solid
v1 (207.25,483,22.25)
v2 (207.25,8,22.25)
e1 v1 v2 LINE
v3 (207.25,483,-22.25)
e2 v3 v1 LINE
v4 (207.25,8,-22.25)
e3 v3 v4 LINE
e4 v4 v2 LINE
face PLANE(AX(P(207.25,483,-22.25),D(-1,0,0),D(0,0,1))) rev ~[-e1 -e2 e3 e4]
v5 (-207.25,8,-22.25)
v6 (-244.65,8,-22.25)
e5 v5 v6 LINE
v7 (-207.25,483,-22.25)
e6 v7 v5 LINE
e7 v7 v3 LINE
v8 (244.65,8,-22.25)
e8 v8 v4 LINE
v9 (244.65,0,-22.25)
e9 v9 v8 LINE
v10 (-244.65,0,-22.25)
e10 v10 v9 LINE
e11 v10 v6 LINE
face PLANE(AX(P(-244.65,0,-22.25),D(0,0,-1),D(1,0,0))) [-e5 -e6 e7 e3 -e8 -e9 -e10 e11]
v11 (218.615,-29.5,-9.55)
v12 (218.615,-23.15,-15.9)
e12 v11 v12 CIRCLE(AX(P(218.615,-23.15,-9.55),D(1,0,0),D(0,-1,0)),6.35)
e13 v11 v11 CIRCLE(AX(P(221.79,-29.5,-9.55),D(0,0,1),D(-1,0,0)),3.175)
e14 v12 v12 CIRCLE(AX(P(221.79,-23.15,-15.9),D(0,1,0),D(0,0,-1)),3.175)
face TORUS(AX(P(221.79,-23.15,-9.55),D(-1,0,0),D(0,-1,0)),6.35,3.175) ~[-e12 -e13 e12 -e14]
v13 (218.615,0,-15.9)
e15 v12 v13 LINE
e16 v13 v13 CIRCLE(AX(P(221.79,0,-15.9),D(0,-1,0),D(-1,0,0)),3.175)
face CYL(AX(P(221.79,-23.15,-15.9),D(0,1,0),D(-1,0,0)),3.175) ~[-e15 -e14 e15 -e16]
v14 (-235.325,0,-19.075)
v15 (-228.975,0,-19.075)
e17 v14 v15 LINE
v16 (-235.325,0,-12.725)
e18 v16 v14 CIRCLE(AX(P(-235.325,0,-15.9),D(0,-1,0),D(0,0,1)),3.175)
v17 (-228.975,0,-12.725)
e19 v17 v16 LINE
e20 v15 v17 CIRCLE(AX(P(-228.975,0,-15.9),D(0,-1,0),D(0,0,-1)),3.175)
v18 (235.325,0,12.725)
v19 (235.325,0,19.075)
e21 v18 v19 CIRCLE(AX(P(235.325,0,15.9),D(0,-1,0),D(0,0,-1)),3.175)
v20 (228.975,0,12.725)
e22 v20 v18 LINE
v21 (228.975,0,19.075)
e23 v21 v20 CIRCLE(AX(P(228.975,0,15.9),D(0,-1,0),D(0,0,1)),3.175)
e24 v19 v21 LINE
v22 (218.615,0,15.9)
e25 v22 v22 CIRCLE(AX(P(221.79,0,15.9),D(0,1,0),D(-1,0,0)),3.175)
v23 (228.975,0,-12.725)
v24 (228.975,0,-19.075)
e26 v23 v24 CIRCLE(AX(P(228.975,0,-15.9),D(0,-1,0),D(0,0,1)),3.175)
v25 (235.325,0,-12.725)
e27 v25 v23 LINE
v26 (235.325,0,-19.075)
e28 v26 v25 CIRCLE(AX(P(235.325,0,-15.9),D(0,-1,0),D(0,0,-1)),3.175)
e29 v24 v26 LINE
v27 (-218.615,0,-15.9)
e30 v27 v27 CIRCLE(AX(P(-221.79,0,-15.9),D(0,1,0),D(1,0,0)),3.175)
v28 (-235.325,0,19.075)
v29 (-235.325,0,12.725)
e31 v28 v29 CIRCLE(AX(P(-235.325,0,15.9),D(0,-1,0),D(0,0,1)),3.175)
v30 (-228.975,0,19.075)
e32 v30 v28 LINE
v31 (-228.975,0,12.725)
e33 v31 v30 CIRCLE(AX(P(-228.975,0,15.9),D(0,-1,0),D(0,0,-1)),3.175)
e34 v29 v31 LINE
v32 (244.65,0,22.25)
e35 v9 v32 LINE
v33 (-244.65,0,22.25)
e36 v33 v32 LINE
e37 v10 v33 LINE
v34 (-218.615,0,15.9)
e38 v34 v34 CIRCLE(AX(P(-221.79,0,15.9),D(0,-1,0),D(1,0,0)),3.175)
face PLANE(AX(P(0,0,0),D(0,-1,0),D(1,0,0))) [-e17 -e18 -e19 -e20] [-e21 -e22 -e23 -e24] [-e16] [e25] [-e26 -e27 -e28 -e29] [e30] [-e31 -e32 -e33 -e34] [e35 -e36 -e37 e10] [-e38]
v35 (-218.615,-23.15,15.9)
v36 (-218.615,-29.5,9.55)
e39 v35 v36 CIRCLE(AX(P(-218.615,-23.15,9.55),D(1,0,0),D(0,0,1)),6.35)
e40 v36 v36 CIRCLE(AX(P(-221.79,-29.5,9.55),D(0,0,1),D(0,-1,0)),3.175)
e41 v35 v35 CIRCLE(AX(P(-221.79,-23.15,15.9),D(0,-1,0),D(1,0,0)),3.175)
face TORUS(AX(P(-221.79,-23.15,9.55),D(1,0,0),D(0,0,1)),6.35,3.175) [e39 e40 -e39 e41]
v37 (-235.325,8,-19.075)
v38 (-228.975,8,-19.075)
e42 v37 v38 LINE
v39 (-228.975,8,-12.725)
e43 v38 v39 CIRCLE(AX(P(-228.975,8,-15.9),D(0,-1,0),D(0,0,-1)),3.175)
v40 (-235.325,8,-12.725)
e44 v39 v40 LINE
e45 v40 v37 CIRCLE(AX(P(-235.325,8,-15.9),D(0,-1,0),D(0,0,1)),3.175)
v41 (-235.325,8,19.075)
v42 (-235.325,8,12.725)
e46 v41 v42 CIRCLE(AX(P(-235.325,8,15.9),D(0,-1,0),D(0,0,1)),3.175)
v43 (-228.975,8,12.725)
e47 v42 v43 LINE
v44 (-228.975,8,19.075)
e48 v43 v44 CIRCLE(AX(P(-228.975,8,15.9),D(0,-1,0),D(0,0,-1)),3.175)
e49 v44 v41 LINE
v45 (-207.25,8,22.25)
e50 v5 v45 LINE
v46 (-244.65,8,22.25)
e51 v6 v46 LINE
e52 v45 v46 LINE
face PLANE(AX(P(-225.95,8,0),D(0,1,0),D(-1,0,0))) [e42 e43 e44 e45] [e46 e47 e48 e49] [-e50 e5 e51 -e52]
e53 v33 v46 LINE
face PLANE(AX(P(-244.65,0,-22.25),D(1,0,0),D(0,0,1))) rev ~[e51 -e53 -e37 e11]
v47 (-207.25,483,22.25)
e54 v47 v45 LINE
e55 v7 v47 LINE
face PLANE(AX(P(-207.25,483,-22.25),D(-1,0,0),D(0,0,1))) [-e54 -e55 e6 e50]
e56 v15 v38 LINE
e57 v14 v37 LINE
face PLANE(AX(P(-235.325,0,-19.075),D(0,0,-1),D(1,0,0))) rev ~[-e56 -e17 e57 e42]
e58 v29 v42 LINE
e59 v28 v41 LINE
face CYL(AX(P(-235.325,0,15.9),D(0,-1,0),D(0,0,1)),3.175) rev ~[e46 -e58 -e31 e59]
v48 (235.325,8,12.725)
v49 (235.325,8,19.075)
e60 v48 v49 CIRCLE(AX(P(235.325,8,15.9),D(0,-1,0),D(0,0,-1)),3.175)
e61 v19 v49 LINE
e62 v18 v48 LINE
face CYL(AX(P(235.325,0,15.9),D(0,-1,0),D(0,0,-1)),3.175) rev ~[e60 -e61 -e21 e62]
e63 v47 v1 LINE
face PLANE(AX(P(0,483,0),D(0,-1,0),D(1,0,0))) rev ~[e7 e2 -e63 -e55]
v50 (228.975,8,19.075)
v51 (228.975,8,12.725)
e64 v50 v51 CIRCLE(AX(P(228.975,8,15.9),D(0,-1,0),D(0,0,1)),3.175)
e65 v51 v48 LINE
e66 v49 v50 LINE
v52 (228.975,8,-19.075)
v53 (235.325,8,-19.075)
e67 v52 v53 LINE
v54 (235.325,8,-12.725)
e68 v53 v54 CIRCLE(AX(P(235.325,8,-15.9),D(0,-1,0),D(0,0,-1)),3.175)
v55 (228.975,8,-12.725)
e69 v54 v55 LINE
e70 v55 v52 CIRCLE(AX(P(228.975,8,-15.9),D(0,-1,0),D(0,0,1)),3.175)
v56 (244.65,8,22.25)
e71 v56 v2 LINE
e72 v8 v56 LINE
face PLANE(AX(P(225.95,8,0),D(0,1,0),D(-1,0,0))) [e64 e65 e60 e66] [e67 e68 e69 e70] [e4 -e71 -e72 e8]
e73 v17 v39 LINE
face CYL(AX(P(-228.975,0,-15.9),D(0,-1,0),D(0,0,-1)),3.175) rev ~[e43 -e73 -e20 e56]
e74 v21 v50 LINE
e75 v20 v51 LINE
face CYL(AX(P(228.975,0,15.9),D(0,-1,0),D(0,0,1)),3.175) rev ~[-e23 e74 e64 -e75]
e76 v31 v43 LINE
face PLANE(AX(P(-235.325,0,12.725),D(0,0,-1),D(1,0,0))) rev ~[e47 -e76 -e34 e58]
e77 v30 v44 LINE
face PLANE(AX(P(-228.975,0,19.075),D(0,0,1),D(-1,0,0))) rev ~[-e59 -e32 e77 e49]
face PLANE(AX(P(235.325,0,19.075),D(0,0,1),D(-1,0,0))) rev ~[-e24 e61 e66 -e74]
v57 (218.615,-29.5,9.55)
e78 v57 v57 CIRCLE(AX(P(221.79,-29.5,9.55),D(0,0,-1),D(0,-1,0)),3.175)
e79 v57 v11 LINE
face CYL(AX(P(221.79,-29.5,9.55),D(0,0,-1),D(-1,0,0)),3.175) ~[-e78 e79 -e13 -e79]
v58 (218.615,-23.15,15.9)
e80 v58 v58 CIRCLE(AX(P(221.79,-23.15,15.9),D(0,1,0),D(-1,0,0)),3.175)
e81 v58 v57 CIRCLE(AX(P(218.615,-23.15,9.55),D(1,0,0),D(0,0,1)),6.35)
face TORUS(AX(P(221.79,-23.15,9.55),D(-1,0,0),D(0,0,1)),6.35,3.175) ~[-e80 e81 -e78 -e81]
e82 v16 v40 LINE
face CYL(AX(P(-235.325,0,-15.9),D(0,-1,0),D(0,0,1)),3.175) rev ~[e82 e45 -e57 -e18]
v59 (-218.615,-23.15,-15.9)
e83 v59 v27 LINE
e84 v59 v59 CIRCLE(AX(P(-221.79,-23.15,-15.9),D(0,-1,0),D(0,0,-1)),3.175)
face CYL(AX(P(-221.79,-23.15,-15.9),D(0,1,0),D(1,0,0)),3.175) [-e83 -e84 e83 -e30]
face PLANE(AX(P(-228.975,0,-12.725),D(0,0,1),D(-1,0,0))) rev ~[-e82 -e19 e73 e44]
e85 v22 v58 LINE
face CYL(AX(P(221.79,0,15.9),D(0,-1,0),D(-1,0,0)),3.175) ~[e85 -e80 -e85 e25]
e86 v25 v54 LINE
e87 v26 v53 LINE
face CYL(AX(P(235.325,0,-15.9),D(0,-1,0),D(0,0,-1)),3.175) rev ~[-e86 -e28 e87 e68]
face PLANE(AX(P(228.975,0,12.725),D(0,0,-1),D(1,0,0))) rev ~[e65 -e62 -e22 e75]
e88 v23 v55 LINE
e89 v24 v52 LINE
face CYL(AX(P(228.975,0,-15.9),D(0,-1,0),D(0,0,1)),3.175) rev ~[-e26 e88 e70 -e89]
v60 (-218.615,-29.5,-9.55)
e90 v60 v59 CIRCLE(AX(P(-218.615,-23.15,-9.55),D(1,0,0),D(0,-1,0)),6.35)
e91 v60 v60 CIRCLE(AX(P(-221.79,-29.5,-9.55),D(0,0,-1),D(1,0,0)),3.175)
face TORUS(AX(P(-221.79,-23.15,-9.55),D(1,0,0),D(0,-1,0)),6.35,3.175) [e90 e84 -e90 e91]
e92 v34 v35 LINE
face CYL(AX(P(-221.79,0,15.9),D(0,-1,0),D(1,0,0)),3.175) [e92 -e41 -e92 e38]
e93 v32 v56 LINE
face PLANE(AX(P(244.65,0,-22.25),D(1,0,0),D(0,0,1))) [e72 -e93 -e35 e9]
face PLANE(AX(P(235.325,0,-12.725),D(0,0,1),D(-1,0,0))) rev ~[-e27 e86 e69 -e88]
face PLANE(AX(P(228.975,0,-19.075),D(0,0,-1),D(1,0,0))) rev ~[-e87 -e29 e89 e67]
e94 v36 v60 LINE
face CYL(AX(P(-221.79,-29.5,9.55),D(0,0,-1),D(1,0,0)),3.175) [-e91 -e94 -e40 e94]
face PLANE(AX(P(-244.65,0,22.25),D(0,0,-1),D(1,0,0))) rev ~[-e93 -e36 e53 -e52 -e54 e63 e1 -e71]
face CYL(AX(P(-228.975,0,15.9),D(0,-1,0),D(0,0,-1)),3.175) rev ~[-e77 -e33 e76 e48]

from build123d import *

# Parameters (mm, degrees)
F0_W     = 489.3
F0_H     = 44.5
F1_DEPTH = 483
F2_W     = 37.4
F2_H     = 44.5
F3_DEPTH = 475
F5_DEPTH = 8
F8_R     = 3.175


with BuildPart() as f1:
    # F0 (on Front) → F1 (new body)
    with BuildSketch(Plane.XZ):
        Rectangle(F0_W, F0_H)
    extrude(amount=-F1_DEPTH)

    # F2 (on face) → F3 (cut)
    with BuildSketch(Plane(origin=(0, 483, 0), x_dir=(-1, 0, 0), z_dir=(0, 1, 0))):
        with Locations((-225.95, 0)):
            Rectangle(F2_W, F2_H)
        with Locations((225.95, 0)):
            Rectangle(F2_W, F2_H)
    extrude(amount=-F3_DEPTH, mode=Mode.SUBTRACT)

    # F4 (on face) → F5 (cut, through all)
    with BuildSketch(Plane.XZ):
        with BuildLine():
            Line((-235.325, 12.725), (-228.975, 12.725))
            ThreePointArc((-228.975, 12.725), (-225.8, 15.9), (-228.975, 19.075))
            Line((-228.975, 19.075), (-235.325, 19.075))
            ThreePointArc((-235.325, 19.075), (-238.5, 15.9), (-235.325, 12.725))
        make_face()
        with BuildLine():
            Line((-228.975, -12.725), (-235.325, -12.725))
            ThreePointArc((-235.325, -12.725), (-238.5, -15.9), (-235.325, -19.075))
            Line((-235.325, -19.075), (-228.975, -19.075))
            ThreePointArc((-228.975, -19.075), (-225.8, -15.9), (-228.975, -12.725))
        make_face()
        with BuildLine():
            Line((235.325, 19.075), (228.975, 19.075))
            ThreePointArc((228.975, 19.075), (225.8, 15.9), (228.975, 12.725))
            Line((228.975, 12.725), (235.325, 12.725))
            ThreePointArc((235.325, 12.725), (238.5, 15.9), (235.325, 19.075))
        make_face()
        with BuildLine():
            Line((235.325, -12.725), (228.975, -12.725))
            ThreePointArc((228.975, -12.725), (225.8, -15.9), (228.975, -19.075))
            Line((228.975, -19.075), (235.325, -19.075))
            ThreePointArc((235.325, -19.075), (238.5, -15.9), (235.325, -12.725))
        make_face()
    extrude(amount=-F5_DEPTH, mode=Mode.SUBTRACT)

    # F9: sweep along a path in F7
    with BuildLine(Plane.YZ.offset(-228.6)) as f9_path:
        Line((0, 15.9), (-23.15, 15.9))
        ThreePointArc((-23.15, 15.9), (-27.6401280605, 14.0401280605), (-29.5, 9.55))
        Line((-29.5, 9.55), (-29.5, -9.55))
        ThreePointArc((-29.5, -9.55), (-27.6401280605, -14.0401280605), (-23.15, -15.9))
        Line((-23.15, -15.9), (0, -15.9))
    # F8 (on face) → F9 (sweep)
    with BuildSketch(Plane.XZ):
        with Locations((-221.79, 15.9)):
            Circle(F8_R)
    sweep(path=f9_path.line)

    # F10: F1 across plane


with BuildPart() as f1_1:
    add(f1.part)
    add(f1.part.mirror(Plane.YZ))


solid = f1_1.part
